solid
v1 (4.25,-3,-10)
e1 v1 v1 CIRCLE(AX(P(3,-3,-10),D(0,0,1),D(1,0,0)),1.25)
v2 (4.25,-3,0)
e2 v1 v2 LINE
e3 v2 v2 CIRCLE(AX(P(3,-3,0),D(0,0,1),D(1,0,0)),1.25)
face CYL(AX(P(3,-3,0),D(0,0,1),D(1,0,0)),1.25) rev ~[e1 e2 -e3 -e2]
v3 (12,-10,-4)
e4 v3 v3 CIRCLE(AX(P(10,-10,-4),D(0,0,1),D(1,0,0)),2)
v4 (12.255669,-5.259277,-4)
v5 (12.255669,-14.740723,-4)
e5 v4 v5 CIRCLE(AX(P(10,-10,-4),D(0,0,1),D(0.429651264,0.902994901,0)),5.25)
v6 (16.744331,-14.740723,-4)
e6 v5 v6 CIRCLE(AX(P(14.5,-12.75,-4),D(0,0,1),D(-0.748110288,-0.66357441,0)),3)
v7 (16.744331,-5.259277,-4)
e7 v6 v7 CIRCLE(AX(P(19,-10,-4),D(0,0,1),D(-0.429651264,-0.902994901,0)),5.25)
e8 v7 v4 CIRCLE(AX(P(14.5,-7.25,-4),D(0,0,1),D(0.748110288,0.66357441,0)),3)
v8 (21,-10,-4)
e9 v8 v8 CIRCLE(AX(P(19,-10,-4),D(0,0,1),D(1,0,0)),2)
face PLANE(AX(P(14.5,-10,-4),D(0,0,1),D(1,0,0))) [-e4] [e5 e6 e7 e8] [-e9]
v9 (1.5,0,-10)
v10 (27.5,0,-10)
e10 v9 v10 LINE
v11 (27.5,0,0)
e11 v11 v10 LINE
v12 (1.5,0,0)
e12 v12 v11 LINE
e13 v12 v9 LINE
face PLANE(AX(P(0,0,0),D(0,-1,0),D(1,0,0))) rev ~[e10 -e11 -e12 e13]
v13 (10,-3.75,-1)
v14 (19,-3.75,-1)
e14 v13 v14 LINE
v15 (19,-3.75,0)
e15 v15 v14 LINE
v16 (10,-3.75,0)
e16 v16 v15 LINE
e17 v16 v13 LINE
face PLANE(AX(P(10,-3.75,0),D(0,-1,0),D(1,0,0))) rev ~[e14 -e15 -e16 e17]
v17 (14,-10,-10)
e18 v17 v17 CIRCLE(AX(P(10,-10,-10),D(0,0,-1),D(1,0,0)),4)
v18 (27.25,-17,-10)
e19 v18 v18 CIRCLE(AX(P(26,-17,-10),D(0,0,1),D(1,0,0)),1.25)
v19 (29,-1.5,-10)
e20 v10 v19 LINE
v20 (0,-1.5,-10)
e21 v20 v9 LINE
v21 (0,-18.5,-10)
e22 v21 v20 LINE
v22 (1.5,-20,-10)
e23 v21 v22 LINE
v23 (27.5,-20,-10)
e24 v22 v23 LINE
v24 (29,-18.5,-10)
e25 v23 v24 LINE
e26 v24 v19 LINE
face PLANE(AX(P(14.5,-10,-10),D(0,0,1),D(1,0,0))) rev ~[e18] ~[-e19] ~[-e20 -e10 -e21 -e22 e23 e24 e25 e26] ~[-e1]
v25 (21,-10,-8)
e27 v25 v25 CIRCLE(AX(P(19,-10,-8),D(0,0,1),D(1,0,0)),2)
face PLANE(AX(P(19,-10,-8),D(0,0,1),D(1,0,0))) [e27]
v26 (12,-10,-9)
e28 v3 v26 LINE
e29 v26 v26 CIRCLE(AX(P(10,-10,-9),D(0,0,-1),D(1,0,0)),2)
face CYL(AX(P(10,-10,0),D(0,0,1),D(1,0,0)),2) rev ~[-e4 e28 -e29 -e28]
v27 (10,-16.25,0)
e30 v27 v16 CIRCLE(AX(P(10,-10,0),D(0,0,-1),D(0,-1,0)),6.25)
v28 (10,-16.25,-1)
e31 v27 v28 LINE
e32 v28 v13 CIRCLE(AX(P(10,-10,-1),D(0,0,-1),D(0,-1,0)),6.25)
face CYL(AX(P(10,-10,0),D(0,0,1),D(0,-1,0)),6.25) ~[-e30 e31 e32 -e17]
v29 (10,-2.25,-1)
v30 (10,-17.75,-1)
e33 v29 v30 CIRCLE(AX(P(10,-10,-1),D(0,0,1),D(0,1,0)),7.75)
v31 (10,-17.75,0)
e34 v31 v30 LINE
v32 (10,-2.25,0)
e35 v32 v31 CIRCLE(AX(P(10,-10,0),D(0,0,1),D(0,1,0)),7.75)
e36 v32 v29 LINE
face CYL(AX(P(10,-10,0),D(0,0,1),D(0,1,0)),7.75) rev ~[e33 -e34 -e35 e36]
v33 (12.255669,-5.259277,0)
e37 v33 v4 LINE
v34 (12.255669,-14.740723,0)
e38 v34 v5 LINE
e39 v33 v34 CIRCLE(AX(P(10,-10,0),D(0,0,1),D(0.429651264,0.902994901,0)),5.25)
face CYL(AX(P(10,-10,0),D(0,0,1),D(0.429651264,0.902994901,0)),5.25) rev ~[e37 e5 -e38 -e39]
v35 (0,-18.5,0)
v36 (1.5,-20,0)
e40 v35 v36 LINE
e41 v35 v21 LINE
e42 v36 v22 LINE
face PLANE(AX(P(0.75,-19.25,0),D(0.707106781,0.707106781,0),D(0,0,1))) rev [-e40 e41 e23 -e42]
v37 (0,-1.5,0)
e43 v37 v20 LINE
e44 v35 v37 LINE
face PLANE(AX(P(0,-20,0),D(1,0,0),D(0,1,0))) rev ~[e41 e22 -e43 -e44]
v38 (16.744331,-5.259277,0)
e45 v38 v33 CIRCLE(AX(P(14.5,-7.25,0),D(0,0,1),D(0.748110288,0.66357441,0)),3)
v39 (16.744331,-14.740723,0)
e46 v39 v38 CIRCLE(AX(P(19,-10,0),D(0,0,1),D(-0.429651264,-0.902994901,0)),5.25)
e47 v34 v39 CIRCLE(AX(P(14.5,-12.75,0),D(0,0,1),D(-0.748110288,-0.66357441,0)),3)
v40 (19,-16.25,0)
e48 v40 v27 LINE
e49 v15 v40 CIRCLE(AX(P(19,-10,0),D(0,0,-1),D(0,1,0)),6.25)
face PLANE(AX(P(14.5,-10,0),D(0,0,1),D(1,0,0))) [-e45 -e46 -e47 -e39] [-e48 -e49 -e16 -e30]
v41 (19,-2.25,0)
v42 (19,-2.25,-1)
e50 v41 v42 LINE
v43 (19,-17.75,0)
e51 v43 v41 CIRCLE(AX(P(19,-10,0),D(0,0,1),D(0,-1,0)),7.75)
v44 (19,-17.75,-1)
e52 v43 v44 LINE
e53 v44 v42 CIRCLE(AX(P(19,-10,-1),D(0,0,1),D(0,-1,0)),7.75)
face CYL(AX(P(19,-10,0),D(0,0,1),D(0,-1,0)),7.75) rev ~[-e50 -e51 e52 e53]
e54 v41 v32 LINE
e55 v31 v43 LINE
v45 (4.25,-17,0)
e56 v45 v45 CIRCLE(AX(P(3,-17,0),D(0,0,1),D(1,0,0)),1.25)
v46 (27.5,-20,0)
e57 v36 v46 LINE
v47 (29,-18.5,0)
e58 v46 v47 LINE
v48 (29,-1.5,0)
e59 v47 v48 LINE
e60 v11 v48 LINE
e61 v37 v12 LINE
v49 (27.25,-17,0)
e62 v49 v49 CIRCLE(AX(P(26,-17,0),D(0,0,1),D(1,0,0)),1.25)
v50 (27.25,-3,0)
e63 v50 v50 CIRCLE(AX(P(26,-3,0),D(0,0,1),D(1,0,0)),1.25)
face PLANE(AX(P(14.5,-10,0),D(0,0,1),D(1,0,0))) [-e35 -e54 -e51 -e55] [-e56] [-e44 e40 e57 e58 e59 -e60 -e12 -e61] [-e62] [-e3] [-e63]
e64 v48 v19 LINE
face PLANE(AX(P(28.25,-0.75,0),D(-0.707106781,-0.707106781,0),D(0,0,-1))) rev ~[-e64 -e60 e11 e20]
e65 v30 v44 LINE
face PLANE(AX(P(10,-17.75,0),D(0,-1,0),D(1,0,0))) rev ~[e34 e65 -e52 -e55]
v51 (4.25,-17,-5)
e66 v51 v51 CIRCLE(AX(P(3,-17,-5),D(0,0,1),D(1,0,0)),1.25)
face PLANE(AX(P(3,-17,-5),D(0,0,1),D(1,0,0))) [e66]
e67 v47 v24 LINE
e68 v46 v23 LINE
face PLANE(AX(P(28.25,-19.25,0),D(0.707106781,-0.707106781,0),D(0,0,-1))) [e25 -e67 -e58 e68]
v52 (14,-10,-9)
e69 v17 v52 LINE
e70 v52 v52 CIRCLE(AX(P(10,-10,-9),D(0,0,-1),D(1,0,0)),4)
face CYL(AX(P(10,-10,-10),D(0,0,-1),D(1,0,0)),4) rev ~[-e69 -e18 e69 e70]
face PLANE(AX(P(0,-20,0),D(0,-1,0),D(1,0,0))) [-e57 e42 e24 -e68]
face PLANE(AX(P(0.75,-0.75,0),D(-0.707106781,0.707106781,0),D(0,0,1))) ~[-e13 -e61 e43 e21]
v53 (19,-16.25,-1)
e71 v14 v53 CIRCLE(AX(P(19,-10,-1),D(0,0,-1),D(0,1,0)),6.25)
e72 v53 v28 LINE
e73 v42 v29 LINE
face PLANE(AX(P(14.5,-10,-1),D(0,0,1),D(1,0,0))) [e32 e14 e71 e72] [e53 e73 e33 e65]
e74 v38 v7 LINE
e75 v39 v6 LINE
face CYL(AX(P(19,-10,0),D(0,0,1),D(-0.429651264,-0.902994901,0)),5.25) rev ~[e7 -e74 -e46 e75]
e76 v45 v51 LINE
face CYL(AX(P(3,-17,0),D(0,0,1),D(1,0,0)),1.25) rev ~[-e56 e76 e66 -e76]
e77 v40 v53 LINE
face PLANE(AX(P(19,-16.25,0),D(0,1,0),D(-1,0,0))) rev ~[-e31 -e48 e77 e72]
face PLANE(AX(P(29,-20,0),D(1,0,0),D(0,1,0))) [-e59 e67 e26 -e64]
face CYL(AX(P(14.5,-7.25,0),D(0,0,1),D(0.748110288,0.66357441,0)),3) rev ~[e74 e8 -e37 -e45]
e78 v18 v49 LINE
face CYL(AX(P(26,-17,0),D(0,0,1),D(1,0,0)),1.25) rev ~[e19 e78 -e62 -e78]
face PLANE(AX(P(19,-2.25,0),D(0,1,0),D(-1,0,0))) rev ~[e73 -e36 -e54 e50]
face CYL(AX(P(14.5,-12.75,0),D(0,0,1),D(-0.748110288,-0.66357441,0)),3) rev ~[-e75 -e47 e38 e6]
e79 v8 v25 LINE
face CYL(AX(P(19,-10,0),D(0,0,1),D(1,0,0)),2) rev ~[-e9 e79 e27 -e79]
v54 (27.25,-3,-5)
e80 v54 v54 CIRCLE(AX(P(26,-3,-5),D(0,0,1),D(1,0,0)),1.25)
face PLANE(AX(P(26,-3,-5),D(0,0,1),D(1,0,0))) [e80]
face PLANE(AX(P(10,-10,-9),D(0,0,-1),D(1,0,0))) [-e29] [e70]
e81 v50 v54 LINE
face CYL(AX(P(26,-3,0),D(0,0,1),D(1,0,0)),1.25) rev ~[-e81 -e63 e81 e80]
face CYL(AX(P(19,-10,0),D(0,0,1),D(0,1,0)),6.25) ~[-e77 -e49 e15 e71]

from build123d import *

# Parameters (mm, degrees)
F0_W     = 29
F0_H     = 20
F0_R     = 1.25
F0_R_2   = 2
F1_DEPTH = 10
F2_DEPTH = 5
F3_DEPTH = 1
F4_DEPTH = 8
F5_DEPTH = 4
F6_R     = 4
F6_R_2   = 2
F7_DEPTH = 1
F8_SIZE  = 1.5


# Not quite as in the source:
# - a feature names something its author has since deleted; it is built from what else it names


with BuildPart() as f1:
    # F0 (on Top) → F1 (new body)
    with BuildSketch(Plane.XY):
        with Locations((14.5, -10)):
            Rectangle(F0_W, F0_H)
        with Locations((3, -17)):
            Circle(F0_R, mode=Mode.SUBTRACT)
        with Locations((26, -17)):
            Circle(F0_R, mode=Mode.SUBTRACT)
        with Locations((3, -3)):
            Circle(F0_R, mode=Mode.SUBTRACT)
        with BuildLine():
            Line((19, -17.75), (10, -17.75))
            ThreePointArc((10, -17.75), (2.25, -10), (10, -2.25))
            Line((10, -2.25), (19, -2.25))
            ThreePointArc((19, -2.25), (26.75, -10), (19, -17.75))
        make_face(mode=Mode.SUBTRACT)
        with Locations((26, -3)):
            Circle(F0_R, mode=Mode.SUBTRACT)
        with BuildLine():
            ThreePointArc((10, -2.25), (2.25, -10), (10, -17.75))
            Line((10, -17.75), (19, -17.75))
            ThreePointArc((19, -17.75), (26.75, -10), (19, -2.25))
            Line((19, -2.25), (10, -2.25))
        make_face()
        with BuildLine():
            ThreePointArc((10, -16.25), (3.75, -10), (10, -3.75))
            Line((10, -3.75), (19, -3.75))
            ThreePointArc((19, -3.75), (25.25, -10), (19, -16.25))
            Line((19, -16.25), (10, -16.25))
        make_face(mode=Mode.SUBTRACT)
        with BuildLine():
            Line((19, -3.75), (10, -3.75))
            ThreePointArc((10, -3.75), (3.75, -10), (10, -16.25))
            Line((10, -16.25), (19, -16.25))
            ThreePointArc((19, -16.25), (25.25, -10), (19, -3.75))
        make_face()
        with BuildLine():
            ThreePointArc((16.7443308628, -5.25927677), (24.25, -10), (16.7443308628, -14.74072323))
            ThreePointArc((16.7443308628, -14.74072323), (14.5, -15.75), (12.2556691372, -14.74072323))
            ThreePointArc((12.2556691372, -14.74072323), (4.75, -10), (12.2556691372, -5.25927677))
            ThreePointArc((12.2556691372, -5.25927677), (14.5, -4.25), (16.7443308628, -5.25927677))
        make_face(mode=Mode.SUBTRACT)
        with BuildLine():
            ThreePointArc((12.2556691372, -14.74072323), (14.5, -15.75), (16.7443308628, -14.74072323))
            ThreePointArc((16.7443308628, -14.74072323), (24.25, -10), (16.7443308628, -5.25927677))
            ThreePointArc((16.7443308628, -5.25927677), (14.5, -4.25), (12.2556691372, -5.25927677))
            ThreePointArc((12.2556691372, -5.25927677), (4.75, -10), (12.2556691372, -14.74072323))
        make_face()
        with Locations((10, -10)):
            Circle(F0_R_2, mode=Mode.SUBTRACT)
        with Locations((19, -10)):
            Circle(F0_R_2, mode=Mode.SUBTRACT)
        with Locations((19, -10)):
            Circle(F0_R_2)
        with Locations((3, -17)):
            Circle(F0_R)
        with Locations((26, -3)):
            Circle(F0_R)
    extrude(amount=-F1_DEPTH)

    # F0 (on Top) → F2 (cut)
    with BuildSketch(Plane.XY):
        with Locations((3, -3)):
            Circle(F0_R)
        with Locations((26, -3)):
            Circle(F0_R)
        with Locations((26, -17)):
            Circle(F0_R)
        with Locations((3, -17)):
            Circle(F0_R)
    extrude(amount=-F2_DEPTH, mode=Mode.SUBTRACT)

    # F0 (on Top) → F3 (cut)
    with BuildSketch(Plane.XY):
        with BuildLine():
            ThreePointArc((10, -2.25), (2.25, -10), (10, -17.75))
            Line((10, -17.75), (19, -17.75))
            ThreePointArc((19, -17.75), (26.75, -10), (19, -2.25))
            Line((19, -2.25), (10, -2.25))
        make_face()
        with BuildLine():
            ThreePointArc((10, -16.25), (3.75, -10), (10, -3.75))
            Line((10, -3.75), (19, -3.75))
            ThreePointArc((19, -3.75), (25.25, -10), (19, -16.25))
            Line((19, -16.25), (10, -16.25))
        make_face(mode=Mode.SUBTRACT)
    extrude(amount=-F3_DEPTH, mode=Mode.SUBTRACT)

    # F0 (on Top) → F4 (cut)
    with BuildSketch(Plane.XY):
        with Locations((19, -10)):
            Circle(F0_R_2)
    extrude(amount=-F4_DEPTH, mode=Mode.SUBTRACT)

    # F0 (on Top) → F5 (cut)
    with BuildSketch(Plane.XY):
        with BuildLine():
            ThreePointArc((12.2556691372, -14.74072323), (14.5, -15.75), (16.7443308628, -14.74072323))
            ThreePointArc((16.7443308628, -14.74072323), (24.25, -10), (16.7443308628, -5.25927677))
            ThreePointArc((16.7443308628, -5.25927677), (14.5, -4.25), (12.2556691372, -5.25927677))
            ThreePointArc((12.2556691372, -5.25927677), (4.75, -10), (12.2556691372, -14.74072323))
        make_face()
        with Locations((10, -10)):
            Circle(F0_R_2, mode=Mode.SUBTRACT)
        with Locations((19, -10)):
            Circle(F0_R_2, mode=Mode.SUBTRACT)
    extrude(amount=-F5_DEPTH, mode=Mode.SUBTRACT)

    # F6 (on face) → F7 (cut)
    with BuildSketch(Plane(origin=(0, 0, -10), x_dir=(1, 0, 0), z_dir=(0, 0, -1))):
        with Locations((10, 10)):
            Circle(F6_R)
        with Locations((10, 10)):
            Circle(F6_R_2, mode=Mode.SUBTRACT)
    extrude(amount=-F7_DEPTH, mode=Mode.SUBTRACT)

    # F8
    f8_edges = [f1.edges().sort_by_distance(p)[0] for p in [
        (29, -20, -5),
        (0, -20, -5),
        (0, 0, -5),
        (29, 0, -5),
    ]]
    chamfer(f8_edges, length=F8_SIZE)


solid = f1.part
